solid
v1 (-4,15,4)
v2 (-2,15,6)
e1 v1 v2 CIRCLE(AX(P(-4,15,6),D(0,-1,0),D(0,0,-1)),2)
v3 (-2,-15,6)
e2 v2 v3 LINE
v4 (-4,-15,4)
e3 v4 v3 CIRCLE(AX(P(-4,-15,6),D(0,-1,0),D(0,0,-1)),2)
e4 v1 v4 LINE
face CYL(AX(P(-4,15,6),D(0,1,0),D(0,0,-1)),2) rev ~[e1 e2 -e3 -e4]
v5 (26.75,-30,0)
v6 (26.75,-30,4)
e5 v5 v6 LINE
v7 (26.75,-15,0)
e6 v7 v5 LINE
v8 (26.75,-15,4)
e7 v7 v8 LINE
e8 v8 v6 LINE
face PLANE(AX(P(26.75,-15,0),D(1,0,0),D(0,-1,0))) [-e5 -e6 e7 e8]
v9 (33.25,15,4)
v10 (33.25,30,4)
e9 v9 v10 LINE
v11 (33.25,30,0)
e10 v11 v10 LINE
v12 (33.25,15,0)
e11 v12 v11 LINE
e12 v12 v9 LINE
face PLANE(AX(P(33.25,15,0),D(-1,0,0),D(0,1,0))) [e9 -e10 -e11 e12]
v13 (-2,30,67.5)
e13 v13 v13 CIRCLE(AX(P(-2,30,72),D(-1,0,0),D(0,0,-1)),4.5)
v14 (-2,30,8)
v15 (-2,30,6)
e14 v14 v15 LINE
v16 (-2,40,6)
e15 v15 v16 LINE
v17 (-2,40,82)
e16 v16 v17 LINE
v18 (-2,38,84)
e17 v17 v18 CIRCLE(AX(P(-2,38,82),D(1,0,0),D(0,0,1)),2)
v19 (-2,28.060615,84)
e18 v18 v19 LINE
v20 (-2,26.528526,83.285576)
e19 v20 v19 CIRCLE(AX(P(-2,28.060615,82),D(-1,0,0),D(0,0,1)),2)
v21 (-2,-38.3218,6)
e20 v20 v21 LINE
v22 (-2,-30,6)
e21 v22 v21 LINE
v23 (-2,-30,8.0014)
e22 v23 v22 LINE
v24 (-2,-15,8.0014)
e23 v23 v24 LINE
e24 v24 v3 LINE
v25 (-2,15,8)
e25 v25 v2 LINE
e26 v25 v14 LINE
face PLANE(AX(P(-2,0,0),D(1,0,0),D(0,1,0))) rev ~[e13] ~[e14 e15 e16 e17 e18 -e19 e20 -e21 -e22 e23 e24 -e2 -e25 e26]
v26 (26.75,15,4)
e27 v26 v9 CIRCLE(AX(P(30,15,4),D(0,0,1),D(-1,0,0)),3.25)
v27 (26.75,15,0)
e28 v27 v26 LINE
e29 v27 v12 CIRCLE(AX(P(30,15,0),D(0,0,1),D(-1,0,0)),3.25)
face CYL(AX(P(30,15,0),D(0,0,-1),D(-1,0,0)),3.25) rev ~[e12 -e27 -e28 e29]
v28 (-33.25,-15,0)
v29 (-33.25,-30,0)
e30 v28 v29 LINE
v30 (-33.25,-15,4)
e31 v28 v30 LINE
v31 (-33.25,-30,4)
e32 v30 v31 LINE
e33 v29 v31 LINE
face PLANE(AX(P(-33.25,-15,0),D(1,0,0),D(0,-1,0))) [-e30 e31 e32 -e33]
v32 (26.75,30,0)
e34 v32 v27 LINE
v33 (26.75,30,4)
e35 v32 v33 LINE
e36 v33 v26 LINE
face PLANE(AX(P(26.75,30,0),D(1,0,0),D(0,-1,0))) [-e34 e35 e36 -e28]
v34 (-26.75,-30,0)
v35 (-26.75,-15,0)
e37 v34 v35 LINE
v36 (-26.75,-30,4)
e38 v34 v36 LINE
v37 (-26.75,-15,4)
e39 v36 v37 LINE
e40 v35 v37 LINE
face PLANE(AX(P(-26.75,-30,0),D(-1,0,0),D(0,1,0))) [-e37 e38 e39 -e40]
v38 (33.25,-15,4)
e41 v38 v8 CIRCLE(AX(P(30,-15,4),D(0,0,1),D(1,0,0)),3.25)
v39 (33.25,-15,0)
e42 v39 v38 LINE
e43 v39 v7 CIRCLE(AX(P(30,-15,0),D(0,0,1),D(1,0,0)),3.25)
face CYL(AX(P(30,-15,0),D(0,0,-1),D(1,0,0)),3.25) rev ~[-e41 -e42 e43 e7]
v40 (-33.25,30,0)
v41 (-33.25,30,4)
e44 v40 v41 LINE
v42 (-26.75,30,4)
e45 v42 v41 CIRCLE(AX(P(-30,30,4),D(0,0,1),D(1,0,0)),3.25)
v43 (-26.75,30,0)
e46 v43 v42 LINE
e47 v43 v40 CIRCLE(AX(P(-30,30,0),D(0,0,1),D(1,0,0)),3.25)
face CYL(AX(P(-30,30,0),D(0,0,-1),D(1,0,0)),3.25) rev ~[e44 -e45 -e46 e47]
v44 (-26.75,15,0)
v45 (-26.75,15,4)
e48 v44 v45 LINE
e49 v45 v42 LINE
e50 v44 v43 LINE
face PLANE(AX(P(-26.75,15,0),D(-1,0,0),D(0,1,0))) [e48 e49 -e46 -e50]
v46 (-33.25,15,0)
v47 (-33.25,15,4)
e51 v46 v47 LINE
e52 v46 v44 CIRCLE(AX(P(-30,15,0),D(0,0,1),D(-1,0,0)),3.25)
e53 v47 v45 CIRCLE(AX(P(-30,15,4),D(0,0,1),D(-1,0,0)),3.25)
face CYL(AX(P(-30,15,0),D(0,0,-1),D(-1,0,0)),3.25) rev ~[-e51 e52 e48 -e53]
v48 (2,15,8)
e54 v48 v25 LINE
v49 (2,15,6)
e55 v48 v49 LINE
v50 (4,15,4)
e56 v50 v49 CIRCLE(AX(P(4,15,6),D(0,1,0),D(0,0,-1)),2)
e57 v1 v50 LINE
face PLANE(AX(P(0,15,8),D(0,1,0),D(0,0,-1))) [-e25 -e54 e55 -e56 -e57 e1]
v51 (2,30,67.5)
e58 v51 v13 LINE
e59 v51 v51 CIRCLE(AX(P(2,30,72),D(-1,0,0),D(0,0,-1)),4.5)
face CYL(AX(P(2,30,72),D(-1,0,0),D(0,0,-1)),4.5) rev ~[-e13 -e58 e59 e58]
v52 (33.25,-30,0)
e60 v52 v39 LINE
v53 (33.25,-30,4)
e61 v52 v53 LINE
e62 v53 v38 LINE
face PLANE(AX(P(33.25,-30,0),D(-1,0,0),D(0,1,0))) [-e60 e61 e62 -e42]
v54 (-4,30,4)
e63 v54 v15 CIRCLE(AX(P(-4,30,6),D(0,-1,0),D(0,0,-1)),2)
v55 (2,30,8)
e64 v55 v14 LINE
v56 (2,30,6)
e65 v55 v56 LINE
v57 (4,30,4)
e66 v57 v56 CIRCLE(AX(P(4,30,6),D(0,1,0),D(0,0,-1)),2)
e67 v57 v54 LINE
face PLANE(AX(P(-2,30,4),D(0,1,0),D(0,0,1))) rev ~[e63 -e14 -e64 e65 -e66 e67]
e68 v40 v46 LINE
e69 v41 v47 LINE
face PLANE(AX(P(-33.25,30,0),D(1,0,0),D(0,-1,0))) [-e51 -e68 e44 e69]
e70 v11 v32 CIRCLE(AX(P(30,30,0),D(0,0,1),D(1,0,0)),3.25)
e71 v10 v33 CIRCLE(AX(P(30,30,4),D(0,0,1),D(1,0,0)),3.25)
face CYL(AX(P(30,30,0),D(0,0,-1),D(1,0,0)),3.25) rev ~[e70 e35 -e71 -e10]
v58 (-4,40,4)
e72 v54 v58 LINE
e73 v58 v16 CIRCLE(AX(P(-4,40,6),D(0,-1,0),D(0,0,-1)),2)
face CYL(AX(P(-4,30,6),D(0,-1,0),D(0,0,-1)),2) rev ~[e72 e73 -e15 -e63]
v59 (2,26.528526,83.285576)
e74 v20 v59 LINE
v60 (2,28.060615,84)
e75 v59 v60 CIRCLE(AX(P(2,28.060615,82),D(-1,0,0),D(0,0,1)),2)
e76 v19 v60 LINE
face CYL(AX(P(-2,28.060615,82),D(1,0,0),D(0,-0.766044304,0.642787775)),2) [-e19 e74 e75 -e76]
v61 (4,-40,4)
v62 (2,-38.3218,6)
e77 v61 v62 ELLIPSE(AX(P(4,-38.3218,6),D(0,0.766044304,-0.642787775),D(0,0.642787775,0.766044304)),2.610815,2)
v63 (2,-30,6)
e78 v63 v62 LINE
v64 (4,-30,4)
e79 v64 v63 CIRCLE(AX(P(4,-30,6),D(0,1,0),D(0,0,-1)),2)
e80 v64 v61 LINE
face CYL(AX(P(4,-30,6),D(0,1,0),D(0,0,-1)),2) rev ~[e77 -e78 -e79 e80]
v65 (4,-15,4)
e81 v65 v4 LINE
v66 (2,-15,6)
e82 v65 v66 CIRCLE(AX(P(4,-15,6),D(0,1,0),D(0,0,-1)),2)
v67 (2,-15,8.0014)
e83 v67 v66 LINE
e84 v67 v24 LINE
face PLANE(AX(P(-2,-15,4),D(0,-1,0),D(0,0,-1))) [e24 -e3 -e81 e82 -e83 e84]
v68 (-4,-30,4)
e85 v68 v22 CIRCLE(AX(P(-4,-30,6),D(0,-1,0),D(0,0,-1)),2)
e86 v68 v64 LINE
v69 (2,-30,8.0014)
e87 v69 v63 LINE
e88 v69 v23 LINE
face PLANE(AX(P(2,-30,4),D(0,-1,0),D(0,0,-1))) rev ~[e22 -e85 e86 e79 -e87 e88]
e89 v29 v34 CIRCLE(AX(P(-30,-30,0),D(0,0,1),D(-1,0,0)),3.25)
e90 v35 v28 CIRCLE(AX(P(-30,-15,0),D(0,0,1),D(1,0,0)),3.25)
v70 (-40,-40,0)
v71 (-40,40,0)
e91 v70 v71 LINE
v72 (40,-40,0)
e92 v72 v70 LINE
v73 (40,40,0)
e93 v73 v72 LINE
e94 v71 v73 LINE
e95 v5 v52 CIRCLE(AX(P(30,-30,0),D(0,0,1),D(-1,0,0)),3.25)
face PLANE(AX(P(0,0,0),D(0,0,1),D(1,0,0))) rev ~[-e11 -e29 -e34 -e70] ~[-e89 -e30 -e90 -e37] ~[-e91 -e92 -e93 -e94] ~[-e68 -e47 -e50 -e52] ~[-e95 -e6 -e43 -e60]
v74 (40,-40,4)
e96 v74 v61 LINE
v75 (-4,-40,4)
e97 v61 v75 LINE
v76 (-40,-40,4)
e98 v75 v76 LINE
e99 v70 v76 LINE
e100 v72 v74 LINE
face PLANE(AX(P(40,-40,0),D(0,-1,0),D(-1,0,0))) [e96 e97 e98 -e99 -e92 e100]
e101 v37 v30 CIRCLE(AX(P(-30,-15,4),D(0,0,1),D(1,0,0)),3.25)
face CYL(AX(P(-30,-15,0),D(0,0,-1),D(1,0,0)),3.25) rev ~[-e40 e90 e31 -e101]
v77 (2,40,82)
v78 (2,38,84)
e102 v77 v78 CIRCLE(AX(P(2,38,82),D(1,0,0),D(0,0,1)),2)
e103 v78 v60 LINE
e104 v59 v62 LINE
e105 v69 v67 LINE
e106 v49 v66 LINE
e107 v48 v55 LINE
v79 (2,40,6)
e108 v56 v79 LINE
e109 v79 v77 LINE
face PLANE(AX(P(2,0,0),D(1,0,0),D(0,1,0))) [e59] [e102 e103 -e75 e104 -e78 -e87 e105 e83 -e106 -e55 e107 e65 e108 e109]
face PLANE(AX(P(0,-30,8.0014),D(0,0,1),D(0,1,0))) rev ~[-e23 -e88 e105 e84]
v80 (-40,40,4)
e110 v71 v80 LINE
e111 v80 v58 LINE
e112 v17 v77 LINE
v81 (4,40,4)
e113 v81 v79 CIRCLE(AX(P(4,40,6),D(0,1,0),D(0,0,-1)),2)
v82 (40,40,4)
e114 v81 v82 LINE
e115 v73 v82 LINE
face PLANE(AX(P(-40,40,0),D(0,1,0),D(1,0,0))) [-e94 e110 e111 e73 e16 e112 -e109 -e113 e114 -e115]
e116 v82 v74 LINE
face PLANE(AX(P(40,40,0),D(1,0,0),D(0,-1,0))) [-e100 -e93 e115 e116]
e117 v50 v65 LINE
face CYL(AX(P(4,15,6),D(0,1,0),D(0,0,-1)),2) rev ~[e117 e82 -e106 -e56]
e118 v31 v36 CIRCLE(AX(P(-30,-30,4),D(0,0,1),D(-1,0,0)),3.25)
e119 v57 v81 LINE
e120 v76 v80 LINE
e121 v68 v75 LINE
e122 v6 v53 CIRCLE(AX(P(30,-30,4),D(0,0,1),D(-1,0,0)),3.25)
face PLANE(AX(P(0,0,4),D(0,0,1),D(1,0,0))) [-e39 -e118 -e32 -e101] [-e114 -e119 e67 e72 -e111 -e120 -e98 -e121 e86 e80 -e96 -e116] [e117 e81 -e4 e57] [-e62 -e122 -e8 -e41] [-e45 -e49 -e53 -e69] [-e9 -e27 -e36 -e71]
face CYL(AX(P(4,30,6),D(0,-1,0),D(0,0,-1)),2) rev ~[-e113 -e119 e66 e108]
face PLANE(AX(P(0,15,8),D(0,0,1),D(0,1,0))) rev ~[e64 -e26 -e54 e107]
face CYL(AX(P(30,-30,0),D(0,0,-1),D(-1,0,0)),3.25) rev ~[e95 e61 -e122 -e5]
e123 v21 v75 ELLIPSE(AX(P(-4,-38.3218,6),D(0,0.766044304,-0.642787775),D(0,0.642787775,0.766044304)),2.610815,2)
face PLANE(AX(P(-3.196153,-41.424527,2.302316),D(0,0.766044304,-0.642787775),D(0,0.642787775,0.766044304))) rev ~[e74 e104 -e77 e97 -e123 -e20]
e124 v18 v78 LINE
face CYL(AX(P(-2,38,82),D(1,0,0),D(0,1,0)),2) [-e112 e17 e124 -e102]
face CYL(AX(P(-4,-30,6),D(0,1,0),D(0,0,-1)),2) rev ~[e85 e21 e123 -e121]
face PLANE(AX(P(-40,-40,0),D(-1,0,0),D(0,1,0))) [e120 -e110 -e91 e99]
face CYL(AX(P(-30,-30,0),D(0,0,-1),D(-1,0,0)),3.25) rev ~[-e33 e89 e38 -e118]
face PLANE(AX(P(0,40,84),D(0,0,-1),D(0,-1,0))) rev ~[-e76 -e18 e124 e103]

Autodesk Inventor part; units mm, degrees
ref_plane "YZ Plane" through (0, 0, 0) normal (1, 0, 0) x (0, 1, 0)
ref_plane "XZ Plane" through (0, 0, 0) normal (0, 1, 0) x (-1, 0, 0)
ref_plane "XY Plane" through (0, 0, 0) normal (0, 0, 1) x (1, 0, 0)
sketch "Sketch2" plane through (0, 0, 0) normal (0, 0, 1) x (1, 0, 0)
  line L0 (40, -40) -> (-40, -40)
  line L1 (-40, -40) -> (-40, 40)
  line L2 (-40, 40) -> (40, 40)
  line L3 (40, 40) -> (40, -40)
  line L4 (-56, 0) -> (56, 0) construction
  line L5 (0, 56) -> (0, -56) construction
  line L6 (-30, 33.25) -> (-30, 11.75) construction
  line L7 (-33.25, 30) -> (-33.25, 15)
  line L8 (-26.75, 15) -> (-26.75, 30)
  arc A0 (-26.75, 30) -> (-33.25, 30) centre (-30, 30) ccw
  arc A1 (-33.25, 15) -> (-26.75, 15) centre (-30, 15) ccw
  line L9 (-26.75, -30) -> (-26.75, -15)
  arc A2 (-26.75, -15) -> (-33.25, -15) centre (-30, -15) ccw
  line L10 (-33.25, -15) -> (-33.25, -30)
  arc A3 (-33.25, -30) -> (-26.75, -30) centre (-30, -30) ccw
  line L11 (33.25, 15) -> (33.25, 30)
  arc A4 (33.25, 30) -> (26.75, 30) centre (30, 30) ccw
  line L12 (26.75, 30) -> (26.75, 15)
  arc A5 (26.75, 15) -> (33.25, 15) centre (30, 15) ccw
  line L13 (33.25, -30) -> (33.25, -15)
  arc A6 (33.25, -15) -> (26.75, -15) centre (30, -15) ccw
  line L14 (26.75, -15) -> (26.75, -30)
  arc A7 (26.75, -30) -> (33.25, -30) centre (30, -30) ccw
  point P0 (0, 0)
  point P1 (0, 0)
  point P2 (0, 0)
  point P3 (-30, 22.5)
  dimension "d10" = 80
  dimension "d11" = 80
  dimension "d12" = 40
  dimension "d13" = 40
  dimension "d14" = 6.5
  dimension "d15" = 10
  dimension "d16" = 10
  dimension "d17" = 15
  dimension "d20" = 45
  dimension "d23" = 60
  dimension "d26" = 6.75
extrude "Extrusion1" add sketch "Sketch2" along normal blind 4
sketch "Sketch3" plane through (0, 0, 0) normal (1, 0, 0) x (0, 1, 0)
  line L0 (33.25, 4) -> (33.25, 0) construction
  line L1 (11.75, 4) -> (11.75, 0) construction
  line L2 (30, 0) -> (15, 0) construction
  line L3 (15, 0) -> (15, 4) construction
  line L4 (30, 4) -> (15, 4) construction
  line L5 (30, 0) -> (30, 4) construction
  line L6 (-15, 0) -> (-30, 0) construction
  line L7 (-30, 0) -> (-30, 4) construction
  line L8 (-15, 4) -> (-30, 4) construction
  line L9 (-15, 0) -> (-15, 4) construction
  line L10 (40, 0) -> (-40, 0) construction
  line L11 (-40, 0) -> (-40, 4) construction
  line L12 (40, 4) -> (-40, 4) construction
  line L13 (40, 0) -> (40, 4) construction
  line L14 (40, 4) -> (40, 84)
  line L15 (40, 84) -> (27.128, 84)
  line L16 (27.128, 84) -> (-40, 4)
  line L17 (-33.25, 4) -> (-33.25, 0) construction
  line L18 (-11.75, 4) -> (-11.75, 0) construction
  line L19 (-30, 8.0014) -> (-15, 8.0014)
  line L20 (15, 8) -> (30, 8)
  line L21 (-15, 8.0014) -> (-15, 4)
  line L22 (-30, 8.0014) -> (-30, 4)
  line L23 (30, 8) -> (30, 4)
  line L24 (15, 8) -> (15, 4)
  line L25 (30, 4) -> (40, 4)
  line L26 (15, 4) -> (-15, 4)
  line L27 (-30, 4) -> (-40, 4)
  point P0 (0, 0)
  dimension "d29" = 80
  dimension "d30" = 4
  dimension "d32" = 130
  dimension "d34" = 4.0014
extrude "Extrusion2" add sketch "Sketch3" along normal mid plane 4
fillet "Fillet1" radius 2 6 edges at (-2, 0, 4) (-2, 35, 4) (-2, -35, 4) (2, 0, 4) (2, 35, 4) (2, -35, 4)
fillet "Fillet2" radius 2 2 edges at (0, 27.128, 84) (0, 40, 84)
sketch "Sketch4" plane through (2, 0, 0) normal (1, 0, 0) x (0, 0, -1)
  arc A0 (-82, 40) -> (-84, 38) centre (-82, 38) ccw construction
  line L0 (-84, 38) -> (-84, 28.0606) construction
  arc A1 (-84, 28.0606) -> (-83.2856, 26.5285) centre (-82, 28.0606) ccw construction
  line L1 (-83.2856, 26.5285) -> (-6, -38.3218) construction
  line L2 (-6, -30) -> (-6, -38.3218) construction
  line L3 (-6, -30) -> (-8.0014, -30) construction
  line L4 (-8.0014, -30) -> (-8.0014, -15) construction
  line L5 (-8.0014, -15) -> (-6, -15) construction
  line L6 (-6, 15) -> (-6, -15) construction
  line L7 (-6, 15) -> (-8, 15) construction
  line L8 (-8, 15) -> (-8, 30) construction
  line L9 (-8, 30) -> (-6, 30) construction
  line L10 (-6, 40) -> (-6, 30) construction
  line L11 (-6, 40) -> (-82, 40) construction
  point P0 (0, 0)
  point P1 (-72, 30)
  dimension "d39" = 12
  dimension "d40" = 10
hole "Hole1" at (2, 30, 72) direction (-1, 0, 0) diameter 9 depth 10
properties part number "P045_SupportUniversel"
